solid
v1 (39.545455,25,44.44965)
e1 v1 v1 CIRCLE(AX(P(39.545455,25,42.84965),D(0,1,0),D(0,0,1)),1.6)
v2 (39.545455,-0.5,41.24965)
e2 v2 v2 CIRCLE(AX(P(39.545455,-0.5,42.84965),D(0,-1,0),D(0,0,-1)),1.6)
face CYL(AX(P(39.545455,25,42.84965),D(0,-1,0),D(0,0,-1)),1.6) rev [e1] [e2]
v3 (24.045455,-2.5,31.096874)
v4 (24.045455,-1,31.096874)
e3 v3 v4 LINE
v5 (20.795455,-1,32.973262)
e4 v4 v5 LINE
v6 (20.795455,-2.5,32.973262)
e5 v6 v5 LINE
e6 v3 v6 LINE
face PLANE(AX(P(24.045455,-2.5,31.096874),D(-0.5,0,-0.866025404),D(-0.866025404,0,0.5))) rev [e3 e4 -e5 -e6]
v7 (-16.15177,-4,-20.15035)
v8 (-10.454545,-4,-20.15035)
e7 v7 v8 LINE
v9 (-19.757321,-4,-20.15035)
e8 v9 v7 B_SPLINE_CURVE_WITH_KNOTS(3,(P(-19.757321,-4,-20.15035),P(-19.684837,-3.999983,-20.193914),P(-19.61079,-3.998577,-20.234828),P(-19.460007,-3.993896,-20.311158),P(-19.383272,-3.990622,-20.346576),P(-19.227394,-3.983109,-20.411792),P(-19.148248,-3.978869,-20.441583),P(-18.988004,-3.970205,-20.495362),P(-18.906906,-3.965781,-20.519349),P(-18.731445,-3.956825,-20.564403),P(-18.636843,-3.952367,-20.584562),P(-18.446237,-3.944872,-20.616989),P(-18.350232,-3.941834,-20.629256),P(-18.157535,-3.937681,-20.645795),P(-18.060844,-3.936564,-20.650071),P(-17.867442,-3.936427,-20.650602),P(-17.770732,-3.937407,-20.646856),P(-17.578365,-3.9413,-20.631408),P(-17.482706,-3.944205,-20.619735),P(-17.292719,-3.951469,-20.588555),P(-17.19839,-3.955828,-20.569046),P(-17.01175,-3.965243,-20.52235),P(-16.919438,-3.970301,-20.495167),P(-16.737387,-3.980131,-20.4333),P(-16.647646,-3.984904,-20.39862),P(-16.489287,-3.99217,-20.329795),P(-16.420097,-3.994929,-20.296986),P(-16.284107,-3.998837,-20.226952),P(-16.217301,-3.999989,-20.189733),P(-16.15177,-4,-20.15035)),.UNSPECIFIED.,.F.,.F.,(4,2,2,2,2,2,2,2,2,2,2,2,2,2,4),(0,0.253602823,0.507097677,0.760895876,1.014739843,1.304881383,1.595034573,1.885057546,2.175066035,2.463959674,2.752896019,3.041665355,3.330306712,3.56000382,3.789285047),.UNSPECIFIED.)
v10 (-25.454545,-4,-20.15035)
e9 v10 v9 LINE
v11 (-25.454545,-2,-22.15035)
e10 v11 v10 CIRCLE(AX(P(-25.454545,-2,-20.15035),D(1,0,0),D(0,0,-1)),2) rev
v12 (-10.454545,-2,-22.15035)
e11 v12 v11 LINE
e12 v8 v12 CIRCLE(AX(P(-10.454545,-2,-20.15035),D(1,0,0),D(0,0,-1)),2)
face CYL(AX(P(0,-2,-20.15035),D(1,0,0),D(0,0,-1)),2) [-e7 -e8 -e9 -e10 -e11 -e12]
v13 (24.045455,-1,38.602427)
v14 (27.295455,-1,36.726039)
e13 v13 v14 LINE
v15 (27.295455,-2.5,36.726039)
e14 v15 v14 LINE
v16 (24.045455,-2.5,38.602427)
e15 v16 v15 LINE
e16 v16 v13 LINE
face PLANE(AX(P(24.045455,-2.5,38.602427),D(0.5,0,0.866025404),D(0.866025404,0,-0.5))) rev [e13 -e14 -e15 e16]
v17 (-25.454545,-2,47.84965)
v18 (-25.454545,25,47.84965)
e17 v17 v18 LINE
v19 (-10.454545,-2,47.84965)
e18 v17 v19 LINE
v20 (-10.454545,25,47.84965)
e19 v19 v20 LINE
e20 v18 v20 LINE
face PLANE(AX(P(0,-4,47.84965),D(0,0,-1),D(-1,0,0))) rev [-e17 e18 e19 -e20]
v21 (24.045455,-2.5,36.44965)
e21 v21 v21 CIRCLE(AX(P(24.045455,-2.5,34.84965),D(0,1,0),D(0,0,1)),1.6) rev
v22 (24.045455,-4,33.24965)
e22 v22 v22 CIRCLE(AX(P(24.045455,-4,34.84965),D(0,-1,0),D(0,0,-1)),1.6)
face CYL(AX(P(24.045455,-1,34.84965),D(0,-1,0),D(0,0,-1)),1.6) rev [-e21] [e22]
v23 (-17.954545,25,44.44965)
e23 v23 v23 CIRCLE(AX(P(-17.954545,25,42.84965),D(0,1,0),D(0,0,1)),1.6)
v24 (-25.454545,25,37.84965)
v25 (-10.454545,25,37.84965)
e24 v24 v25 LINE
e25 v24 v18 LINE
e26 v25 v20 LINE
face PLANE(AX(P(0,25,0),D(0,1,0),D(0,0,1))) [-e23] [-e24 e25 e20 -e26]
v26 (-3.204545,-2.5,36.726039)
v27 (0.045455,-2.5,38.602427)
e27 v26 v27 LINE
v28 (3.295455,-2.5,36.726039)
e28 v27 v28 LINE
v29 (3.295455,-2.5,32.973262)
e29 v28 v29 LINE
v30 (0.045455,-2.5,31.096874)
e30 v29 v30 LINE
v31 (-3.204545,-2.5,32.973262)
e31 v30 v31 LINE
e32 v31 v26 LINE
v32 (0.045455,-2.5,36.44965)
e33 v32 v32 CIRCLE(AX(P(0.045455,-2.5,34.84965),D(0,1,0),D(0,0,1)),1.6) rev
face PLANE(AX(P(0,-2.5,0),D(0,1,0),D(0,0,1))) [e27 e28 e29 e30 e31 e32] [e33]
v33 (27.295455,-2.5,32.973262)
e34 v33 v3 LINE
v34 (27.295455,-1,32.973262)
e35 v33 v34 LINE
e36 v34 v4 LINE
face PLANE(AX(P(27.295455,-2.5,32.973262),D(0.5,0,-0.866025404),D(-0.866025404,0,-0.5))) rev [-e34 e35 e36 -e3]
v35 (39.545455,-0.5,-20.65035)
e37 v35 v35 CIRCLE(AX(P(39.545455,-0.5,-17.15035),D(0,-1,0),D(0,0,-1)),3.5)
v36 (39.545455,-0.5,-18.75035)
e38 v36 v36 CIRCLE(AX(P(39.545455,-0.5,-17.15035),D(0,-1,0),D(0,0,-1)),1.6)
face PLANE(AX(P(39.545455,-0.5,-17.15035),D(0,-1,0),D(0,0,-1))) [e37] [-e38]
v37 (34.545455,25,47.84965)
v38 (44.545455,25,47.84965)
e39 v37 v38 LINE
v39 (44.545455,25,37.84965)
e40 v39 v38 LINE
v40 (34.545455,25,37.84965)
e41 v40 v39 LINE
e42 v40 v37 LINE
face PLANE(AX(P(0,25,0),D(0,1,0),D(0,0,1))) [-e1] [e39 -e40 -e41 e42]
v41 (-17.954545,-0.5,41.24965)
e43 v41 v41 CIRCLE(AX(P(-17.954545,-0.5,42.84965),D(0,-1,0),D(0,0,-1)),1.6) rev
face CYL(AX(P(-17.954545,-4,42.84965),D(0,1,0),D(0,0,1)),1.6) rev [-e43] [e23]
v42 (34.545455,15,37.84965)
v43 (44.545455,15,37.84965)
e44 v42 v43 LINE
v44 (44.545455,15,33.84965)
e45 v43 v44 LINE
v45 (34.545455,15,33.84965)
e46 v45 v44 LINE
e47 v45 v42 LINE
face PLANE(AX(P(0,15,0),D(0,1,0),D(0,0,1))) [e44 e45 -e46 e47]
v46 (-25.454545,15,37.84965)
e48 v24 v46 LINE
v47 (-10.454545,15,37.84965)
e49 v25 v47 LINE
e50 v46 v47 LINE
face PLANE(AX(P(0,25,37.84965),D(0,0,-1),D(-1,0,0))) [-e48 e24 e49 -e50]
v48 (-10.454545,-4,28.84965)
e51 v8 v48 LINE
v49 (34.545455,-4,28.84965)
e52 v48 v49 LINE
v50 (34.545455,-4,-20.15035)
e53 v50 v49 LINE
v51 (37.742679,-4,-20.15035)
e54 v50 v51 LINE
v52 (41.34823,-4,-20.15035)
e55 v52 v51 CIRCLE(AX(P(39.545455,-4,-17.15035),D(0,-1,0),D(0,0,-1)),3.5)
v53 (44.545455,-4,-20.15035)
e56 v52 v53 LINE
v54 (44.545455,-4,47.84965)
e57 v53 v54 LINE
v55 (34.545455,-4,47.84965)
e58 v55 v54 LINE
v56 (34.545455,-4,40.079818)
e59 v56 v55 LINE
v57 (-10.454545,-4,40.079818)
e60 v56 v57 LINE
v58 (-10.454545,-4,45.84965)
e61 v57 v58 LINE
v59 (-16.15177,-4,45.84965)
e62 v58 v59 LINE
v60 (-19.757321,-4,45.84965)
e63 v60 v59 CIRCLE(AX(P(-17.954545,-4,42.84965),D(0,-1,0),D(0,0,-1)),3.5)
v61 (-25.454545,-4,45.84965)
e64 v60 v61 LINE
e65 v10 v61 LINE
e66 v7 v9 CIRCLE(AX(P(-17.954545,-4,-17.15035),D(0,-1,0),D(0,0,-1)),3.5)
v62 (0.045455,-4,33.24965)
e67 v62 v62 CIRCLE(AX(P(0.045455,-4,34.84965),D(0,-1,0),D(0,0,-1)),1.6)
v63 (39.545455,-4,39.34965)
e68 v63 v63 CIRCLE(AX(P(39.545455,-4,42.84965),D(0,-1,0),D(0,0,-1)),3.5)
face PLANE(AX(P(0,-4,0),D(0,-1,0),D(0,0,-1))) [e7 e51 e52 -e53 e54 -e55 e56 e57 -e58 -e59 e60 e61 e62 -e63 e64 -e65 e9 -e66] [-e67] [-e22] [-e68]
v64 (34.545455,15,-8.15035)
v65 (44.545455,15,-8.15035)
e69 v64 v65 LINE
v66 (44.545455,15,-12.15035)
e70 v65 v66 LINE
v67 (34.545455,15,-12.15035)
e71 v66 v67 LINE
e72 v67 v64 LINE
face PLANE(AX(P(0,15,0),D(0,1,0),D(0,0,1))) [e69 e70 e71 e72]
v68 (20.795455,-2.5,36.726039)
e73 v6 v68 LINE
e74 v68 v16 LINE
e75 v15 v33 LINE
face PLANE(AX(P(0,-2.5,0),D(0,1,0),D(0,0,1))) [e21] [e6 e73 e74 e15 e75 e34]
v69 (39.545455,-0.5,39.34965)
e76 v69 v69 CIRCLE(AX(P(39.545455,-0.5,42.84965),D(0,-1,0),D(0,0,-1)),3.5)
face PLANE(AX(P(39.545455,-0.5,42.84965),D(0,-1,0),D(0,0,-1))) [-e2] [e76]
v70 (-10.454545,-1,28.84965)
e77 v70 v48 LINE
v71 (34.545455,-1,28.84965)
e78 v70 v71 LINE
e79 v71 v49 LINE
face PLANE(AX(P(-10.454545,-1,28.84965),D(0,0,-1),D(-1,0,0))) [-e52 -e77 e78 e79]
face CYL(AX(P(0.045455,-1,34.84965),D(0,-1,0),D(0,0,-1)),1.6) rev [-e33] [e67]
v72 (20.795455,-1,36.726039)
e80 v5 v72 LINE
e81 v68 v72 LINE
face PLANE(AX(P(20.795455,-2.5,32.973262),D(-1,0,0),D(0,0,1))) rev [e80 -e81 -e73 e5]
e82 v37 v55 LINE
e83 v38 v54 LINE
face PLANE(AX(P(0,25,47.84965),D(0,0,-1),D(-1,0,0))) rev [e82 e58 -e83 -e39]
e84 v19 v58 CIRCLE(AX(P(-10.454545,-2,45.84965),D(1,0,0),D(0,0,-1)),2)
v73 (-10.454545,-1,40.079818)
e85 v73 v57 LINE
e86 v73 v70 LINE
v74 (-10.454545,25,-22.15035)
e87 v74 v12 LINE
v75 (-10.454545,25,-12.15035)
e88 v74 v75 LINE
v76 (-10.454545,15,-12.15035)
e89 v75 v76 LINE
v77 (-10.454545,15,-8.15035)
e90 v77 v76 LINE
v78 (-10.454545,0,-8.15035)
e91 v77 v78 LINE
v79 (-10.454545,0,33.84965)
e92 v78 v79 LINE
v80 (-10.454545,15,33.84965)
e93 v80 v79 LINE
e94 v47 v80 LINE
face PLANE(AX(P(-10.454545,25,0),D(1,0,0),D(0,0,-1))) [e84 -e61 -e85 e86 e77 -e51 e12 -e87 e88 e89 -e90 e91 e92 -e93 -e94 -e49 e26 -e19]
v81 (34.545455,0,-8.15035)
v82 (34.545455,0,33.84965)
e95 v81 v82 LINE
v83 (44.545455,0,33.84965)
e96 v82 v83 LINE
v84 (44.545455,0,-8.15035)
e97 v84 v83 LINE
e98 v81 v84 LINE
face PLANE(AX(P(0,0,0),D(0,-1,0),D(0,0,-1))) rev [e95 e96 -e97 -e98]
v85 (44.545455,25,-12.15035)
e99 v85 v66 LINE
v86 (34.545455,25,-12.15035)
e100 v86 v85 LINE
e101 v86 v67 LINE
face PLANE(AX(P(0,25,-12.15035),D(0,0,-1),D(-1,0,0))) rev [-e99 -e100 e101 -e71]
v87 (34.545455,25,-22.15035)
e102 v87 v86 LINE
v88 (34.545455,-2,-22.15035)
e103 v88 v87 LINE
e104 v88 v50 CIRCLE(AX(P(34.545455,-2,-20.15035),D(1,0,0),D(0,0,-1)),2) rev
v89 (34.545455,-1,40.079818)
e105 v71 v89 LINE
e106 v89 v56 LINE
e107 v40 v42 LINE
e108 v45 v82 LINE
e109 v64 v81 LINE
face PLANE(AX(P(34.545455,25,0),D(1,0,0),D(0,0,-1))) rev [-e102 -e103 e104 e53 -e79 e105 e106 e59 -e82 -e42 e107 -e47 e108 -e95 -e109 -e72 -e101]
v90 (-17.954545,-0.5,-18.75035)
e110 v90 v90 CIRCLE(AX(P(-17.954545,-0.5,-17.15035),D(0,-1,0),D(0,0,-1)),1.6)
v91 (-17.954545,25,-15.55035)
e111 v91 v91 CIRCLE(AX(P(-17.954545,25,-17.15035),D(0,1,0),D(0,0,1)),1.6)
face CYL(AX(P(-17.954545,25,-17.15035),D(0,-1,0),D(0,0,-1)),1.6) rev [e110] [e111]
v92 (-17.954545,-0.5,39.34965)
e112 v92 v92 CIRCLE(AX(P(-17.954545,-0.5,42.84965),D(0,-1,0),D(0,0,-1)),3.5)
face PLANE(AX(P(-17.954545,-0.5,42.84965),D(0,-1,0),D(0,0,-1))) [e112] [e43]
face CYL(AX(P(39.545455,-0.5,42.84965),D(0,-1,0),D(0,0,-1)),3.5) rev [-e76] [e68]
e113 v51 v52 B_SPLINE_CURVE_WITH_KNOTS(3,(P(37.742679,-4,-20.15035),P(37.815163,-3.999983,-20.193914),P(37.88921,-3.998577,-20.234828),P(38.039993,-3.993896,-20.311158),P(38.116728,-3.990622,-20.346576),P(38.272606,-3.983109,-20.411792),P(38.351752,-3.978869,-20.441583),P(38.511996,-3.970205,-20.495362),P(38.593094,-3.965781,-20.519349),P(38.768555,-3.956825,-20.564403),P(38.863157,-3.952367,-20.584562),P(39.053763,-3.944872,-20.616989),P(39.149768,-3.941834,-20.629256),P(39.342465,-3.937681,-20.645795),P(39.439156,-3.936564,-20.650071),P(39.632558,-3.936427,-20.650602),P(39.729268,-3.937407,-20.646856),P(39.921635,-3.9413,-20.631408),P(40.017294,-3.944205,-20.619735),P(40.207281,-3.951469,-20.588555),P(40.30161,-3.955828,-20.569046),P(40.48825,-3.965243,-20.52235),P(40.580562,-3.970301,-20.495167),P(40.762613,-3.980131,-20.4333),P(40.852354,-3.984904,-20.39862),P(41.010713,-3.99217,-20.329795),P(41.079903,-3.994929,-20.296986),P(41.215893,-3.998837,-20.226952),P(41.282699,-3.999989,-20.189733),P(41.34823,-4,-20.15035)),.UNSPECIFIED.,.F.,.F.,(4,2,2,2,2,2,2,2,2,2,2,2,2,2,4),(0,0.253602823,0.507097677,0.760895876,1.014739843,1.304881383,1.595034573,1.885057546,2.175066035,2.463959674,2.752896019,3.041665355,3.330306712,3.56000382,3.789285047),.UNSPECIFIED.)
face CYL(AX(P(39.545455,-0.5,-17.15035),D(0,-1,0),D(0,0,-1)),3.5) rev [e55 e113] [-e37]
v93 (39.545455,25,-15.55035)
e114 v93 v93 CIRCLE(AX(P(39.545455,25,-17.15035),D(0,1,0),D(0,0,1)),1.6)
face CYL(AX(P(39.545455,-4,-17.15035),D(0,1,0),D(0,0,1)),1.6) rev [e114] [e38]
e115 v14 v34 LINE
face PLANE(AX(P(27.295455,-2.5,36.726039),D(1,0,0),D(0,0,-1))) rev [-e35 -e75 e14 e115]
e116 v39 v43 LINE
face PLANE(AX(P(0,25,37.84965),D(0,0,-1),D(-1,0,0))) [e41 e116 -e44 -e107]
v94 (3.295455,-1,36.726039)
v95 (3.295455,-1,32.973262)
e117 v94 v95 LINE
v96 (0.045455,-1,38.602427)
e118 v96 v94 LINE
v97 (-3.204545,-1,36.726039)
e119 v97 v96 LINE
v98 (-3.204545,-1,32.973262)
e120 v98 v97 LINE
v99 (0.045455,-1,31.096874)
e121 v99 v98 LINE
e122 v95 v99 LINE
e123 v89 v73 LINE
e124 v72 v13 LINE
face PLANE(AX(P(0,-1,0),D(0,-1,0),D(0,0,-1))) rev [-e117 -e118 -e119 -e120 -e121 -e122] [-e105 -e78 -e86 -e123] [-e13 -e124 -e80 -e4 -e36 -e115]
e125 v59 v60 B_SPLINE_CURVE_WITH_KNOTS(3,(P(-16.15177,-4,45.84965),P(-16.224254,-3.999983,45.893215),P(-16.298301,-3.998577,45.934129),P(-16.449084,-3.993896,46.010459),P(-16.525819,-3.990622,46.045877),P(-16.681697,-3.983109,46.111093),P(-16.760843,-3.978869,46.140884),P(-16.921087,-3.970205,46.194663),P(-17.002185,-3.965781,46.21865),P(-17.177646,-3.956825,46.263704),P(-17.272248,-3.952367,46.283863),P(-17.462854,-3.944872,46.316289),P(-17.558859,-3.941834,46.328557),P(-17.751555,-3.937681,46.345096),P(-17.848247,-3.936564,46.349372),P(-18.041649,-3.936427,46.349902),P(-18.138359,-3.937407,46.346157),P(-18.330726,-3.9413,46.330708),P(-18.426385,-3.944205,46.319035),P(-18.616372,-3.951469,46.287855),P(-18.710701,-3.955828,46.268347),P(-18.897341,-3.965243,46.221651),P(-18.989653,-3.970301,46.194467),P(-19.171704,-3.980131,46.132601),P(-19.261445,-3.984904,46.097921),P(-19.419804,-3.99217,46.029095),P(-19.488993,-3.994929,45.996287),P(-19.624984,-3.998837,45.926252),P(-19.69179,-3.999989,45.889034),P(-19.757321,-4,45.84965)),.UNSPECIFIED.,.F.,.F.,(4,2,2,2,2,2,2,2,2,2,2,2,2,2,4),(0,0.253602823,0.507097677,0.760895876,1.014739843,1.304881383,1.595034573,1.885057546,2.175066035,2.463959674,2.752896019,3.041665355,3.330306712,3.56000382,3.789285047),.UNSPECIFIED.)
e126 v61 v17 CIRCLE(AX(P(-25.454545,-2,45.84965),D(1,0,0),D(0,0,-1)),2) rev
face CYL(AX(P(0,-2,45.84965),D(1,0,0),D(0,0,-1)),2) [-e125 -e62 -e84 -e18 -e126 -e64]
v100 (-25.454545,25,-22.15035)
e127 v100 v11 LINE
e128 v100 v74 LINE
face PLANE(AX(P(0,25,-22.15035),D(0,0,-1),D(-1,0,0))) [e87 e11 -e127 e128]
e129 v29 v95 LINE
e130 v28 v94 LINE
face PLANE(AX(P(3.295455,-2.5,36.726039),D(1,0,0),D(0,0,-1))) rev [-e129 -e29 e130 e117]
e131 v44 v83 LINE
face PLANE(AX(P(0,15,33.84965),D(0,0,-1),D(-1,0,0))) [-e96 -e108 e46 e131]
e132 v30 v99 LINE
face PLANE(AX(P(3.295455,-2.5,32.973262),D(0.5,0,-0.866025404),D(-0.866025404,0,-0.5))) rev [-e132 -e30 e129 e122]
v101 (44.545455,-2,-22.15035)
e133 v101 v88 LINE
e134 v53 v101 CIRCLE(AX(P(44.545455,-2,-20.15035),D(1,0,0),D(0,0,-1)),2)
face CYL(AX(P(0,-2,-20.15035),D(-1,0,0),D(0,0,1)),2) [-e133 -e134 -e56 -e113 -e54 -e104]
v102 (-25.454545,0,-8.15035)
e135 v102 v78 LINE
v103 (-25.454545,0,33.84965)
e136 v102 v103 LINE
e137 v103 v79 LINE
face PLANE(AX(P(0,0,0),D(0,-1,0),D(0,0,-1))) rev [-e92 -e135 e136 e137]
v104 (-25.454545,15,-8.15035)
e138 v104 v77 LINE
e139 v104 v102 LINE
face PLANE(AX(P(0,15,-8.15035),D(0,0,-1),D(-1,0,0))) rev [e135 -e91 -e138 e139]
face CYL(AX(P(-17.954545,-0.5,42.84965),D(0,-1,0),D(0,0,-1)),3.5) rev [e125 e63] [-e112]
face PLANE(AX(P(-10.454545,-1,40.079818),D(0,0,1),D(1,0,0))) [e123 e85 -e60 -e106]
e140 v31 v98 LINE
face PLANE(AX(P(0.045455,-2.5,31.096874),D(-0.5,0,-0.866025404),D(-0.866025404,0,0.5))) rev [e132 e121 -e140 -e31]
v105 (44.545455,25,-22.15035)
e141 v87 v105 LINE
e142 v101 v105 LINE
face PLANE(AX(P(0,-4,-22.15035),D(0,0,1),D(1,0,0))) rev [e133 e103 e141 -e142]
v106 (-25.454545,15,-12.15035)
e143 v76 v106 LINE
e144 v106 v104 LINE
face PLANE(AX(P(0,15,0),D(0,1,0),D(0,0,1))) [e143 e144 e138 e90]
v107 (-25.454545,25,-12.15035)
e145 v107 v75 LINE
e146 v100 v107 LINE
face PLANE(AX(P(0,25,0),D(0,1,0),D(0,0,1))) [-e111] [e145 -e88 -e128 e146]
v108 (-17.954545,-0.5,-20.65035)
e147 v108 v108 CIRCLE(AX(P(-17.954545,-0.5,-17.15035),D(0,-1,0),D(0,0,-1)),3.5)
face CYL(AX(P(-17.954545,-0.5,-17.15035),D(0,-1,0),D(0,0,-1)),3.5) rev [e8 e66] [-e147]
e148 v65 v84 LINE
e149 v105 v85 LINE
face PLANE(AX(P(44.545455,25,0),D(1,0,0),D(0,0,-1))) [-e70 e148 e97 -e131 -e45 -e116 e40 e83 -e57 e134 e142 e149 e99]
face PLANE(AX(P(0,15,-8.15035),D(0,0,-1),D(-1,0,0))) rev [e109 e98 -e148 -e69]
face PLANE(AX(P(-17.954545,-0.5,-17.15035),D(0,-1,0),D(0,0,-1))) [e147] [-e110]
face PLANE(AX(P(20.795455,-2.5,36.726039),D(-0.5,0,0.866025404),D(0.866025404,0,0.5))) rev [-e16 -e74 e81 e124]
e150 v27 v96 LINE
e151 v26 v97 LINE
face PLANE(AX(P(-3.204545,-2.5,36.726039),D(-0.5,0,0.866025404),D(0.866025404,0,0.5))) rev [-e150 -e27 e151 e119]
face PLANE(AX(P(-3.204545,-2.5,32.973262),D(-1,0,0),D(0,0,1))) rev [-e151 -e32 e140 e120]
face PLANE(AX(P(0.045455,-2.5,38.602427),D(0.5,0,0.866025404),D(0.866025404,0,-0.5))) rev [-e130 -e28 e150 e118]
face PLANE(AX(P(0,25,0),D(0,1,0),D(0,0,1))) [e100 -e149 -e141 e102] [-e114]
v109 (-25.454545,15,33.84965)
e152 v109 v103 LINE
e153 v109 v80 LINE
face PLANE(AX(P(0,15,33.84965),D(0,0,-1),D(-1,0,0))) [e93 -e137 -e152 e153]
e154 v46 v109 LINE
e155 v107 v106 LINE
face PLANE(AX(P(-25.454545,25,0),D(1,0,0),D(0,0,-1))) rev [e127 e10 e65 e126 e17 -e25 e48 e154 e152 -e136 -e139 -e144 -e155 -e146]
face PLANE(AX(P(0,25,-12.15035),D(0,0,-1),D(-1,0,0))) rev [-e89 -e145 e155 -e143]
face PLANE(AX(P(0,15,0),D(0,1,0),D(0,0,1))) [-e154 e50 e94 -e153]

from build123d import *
from build123d.topology import SkipClean

# Parameters (mm, degrees)
CROQUIS1_W                = 15
CROQUIS1_H                = 10
CROQUIS1_R                = 1.6
SALIENTE_EXTRUIR2_DEPTH   = 25
SALIENTE_EXTRUIR2_2_DEPTH = 25
CROQUIS1_W_2              = 10
SALIENTE_EXTRUIR2_3_DEPTH = 25
SALIENTE_EXTRUIR2_4_DEPTH = 25
SALIENTE_EXTRUIR3_START   = 4
CROQUIS2_R                = 1.6
CROQUIS2_W                = 15
CROQUIS2_H                = 10
SALIENTE_EXTRUIR3_DEPTH   = 4
CROQUIS3_W                = 15
CROQUIS3_H                = 4
CROQUIS3_W_2              = 10
SALIENTE_EXTRUIR4_DEPTH   = 15
CROQUIS4_R                = 3.5
CORTAR_EXTRUIR1_DEPTH     = 3.5
SALIENTE_EXTRUIR5_DEPTH   = 3
CROQUIS6_R                = 1.6
CORTAR_EXTRUIR2_DEPTH     = 3
CORTAR_EXTRUIR3_DEPTH     = 1.5
REDONDEO1_R               = 2


with BuildPart() as part:
    # Croquis1 → Saliente-Extruir2 (new body)
    with BuildSketch(Plane(origin=(0, 0, 0), x_dir=(1, 0, 0), z_dir=(0, 1, 0))):
        with Locations((-17.954545455, 17.15034965)):
            Rectangle(CROQUIS1_W, CROQUIS1_H)
        with Locations(Location((-17.954545455, 17.15034965, 0), (0, 0, 270))):
            Circle(CROQUIS1_R, mode=Mode.SUBTRACT)
    extrude(amount=SALIENTE_EXTRUIR2_DEPTH)



with BuildPart() as body_2:
    # Croquis1 → Saliente-Extruir2 2 (new body)
    with BuildSketch(Plane(origin=(0, 0, 0), x_dir=(1, 0, 0), z_dir=(0, 1, 0))):
        with Locations((-17.954545455, -42.84965035)):
            Rectangle(CROQUIS1_W, CROQUIS1_H)
        with Locations(Location((-17.954545455, -42.84965035, 0), (0, 0, 270))):
            Circle(CROQUIS1_R, mode=Mode.SUBTRACT)
    extrude(amount=SALIENTE_EXTRUIR2_2_DEPTH)


with BuildPart() as body_3:
    # Croquis1 → Saliente-Extruir2 3 (new body)
    with BuildSketch(Plane(origin=(0, 0, 0), x_dir=(1, 0, 0), z_dir=(0, 1, 0))):
        with Locations((39.545454545, -42.84965035)):
            Rectangle(CROQUIS1_W_2, CROQUIS1_H)
        with Locations(Location((39.545454545, -42.84965035, 0), (0, 0, 270))):
            Circle(CROQUIS1_R, mode=Mode.SUBTRACT)
    extrude(amount=SALIENTE_EXTRUIR2_3_DEPTH)


with BuildPart() as body_4:
    # Croquis1 → Saliente-Extruir2 4 (new body)
    with BuildSketch(Plane(origin=(0, 0, 0), x_dir=(1, 0, 0), z_dir=(0, 1, 0))):
        with Locations((39.545454545, 17.15034965)):
            Rectangle(CROQUIS1_W_2, CROQUIS1_H)
        with Locations(Location((39.545454545, 17.15034965, 0), (0, 0, 270))):
            Circle(CROQUIS1_R, mode=Mode.SUBTRACT)
    extrude(amount=SALIENTE_EXTRUIR2_4_DEPTH)


with BuildPart() as part_1:
    with SkipClean():  # the faces are left unmerged after this step: merging them gives an invalid solid
        add(part.part)

        add(body_2.part)  # Saliente-Extruir3 merges body 2

        add(body_3.part)  # Saliente-Extruir3 merges body 3

        add(body_4.part)  # Saliente-Extruir3 merges body 4
        # Croquis2 → Saliente-Extruir3 (add)
        # profile 1 of 3: a face of its own
        with BuildSketch(Plane.XZ.offset(SALIENTE_EXTRUIR3_START)):
            Polygon((-25.454545455, -22.15034965), (-10.454545455, -22.15034965), (-10.454545455, -12.15034965), (-10.454545455, 37.84965035), (-25.454545455, 37.84965035), (-25.454545455, -12.15034965), align=None)
            with Locations(Location((-17.954545455, -17.15034965, 0), (0, 0, 270))):
                Circle(CROQUIS2_R, mode=Mode.SUBTRACT)
        # profile 2 of 3: a face of its own
        with BuildSketch(Plane.XZ.offset(SALIENTE_EXTRUIR3_START)):
            with Locations((-17.954545455, 42.84965035)):
                Rectangle(CROQUIS2_W, CROQUIS2_H)
            with Locations(Location((-17.954545455, 42.84965035, 0), (0, 0, 90))):
                Circle(CROQUIS2_R, mode=Mode.SUBTRACT)
        # profile 3 of 3: a face of its own
        with BuildSketch(Plane.XZ.offset(SALIENTE_EXTRUIR3_START)):
            Polygon((34.545454545, -12.15034965), (34.545454545, -22.15034965), (44.545454545, -22.15034965), (44.545454545, -12.15034965), (44.545454545, 37.84965035), (44.545454545, 47.84965035), (34.545454545, 47.84965035), (34.545454545, 37.84965035), align=None)
            with Locations(Location((39.545454545, -17.15034965, 0), (0, 0, 90))):
                Circle(CROQUIS2_R, mode=Mode.SUBTRACT)
            with Locations(Location((39.545454545, 42.84965035, 0), (0, 0, 270))):
                Circle(CROQUIS2_R, mode=Mode.SUBTRACT)
        extrude(amount=-SALIENTE_EXTRUIR3_DEPTH)

    # Croquis3 → Saliente-Extruir4 (add)
    with BuildSketch(Plane(origin=(0, 0, 0), x_dir=(1, 0, 0), z_dir=(0, 1, 0))):
        with Locations((-17.954545455, -35.84965035)):
            Rectangle(CROQUIS3_W, CROQUIS3_H)
        with Locations((-17.954545455, 10.15034965)):
            Rectangle(CROQUIS3_W, CROQUIS3_H)
        with Locations((39.545454545, 10.15034965)):
            Rectangle(CROQUIS3_W_2, CROQUIS3_H)
        with Locations((39.545454545, -35.84965035)):
            Rectangle(CROQUIS3_W_2, CROQUIS3_H)
    extrude(amount=SALIENTE_EXTRUIR4_DEPTH)

    # Croquis4 → Cortar-Extruir1 (cut)
    with SkipClean():  # the faces are left unmerged after this step: merging them gives an invalid solid
        with BuildSketch(Plane.XZ.offset(4)):
            with Locations(Location((39.545454545, 42.84965035, 0), (0, 0, 270))):
                Circle(CROQUIS4_R)
            with Locations(Location((39.545454545, -17.15034965, 0), (0, 0, 270))):
                Circle(CROQUIS4_R)
            with Locations(Location((-17.954545455, -17.15034965, 0), (0, 0, 270))):
                Circle(CROQUIS4_R)
            with Locations(Location((-17.954545455, 42.84965035, 0), (0, 0, 270))):
                Circle(CROQUIS4_R)
        extrude(amount=-CORTAR_EXTRUIR1_DEPTH, mode=Mode.SUBTRACT)

    # Croquis5 → Saliente-Extruir5 (add)
    with SkipClean():  # the faces are left unmerged after this step: merging them gives an invalid solid
        with BuildSketch(Plane.XZ.offset(4)):
            Polygon((-10.454545455, 40.07981816), (34.545454545, 40.07981816), (34.545454545, 35.84965035), (34.545454545, 28.84965035), (-10.454545455, 28.84965035), (-10.454545455, 35.84965035), align=None)
        extrude(amount=-SALIENTE_EXTRUIR5_DEPTH)

    # Croquis6 → Cortar-Extruir2 (cut)
    with SkipClean():  # the faces are left unmerged after this step: merging them gives an invalid solid
        with BuildSketch(Plane.XZ.offset(4)):
            with Locations(Location((24.045454545, 34.84965035, 0), (0, 0, 270))):
                Circle(CROQUIS6_R)
            with Locations(Location((0.045454545, 34.84965035, 0), (0, 0, 270))):
                Circle(CROQUIS6_R)
        extrude(amount=-CORTAR_EXTRUIR2_DEPTH, mode=Mode.SUBTRACT)

    # Croquis7 → Cortar-Extruir3 (cut)
    with SkipClean():  # the faces are left unmerged after this step: merging them gives an invalid solid
        with BuildSketch(Plane(origin=(0, -1, 0), x_dir=(1, 0, 0), z_dir=(0, 1, 0))):
            Polygon((0.045454545, -31.0968736), (-3.204545455, -32.973261975), (-3.204545455, -36.726038725), (0.045454545, -38.602427099), (3.295454545, -36.726038725), (3.295454545, -32.973261975), align=None)
            Polygon((24.045454545, -31.0968736), (20.795454545, -32.973261975), (20.795454545, -36.726038725), (24.045454545, -38.602427099), (27.295454545, -36.726038725), (27.295454545, -32.973261975), align=None)
        extrude(amount=-CORTAR_EXTRUIR3_DEPTH, mode=Mode.SUBTRACT)

    # Redondeo1
    # the kernel refuses this fillet: 2 mm, written as the material it takes off along each edge
    with BuildSketch(Plane(origin=(-5.454545455, -4, 47.84965035), x_dir=(0, 0, -1), z_dir=(-1, 0, 0)), Plane(origin=(-30.454545455, -4, -22.15034965), x_dir=(0, 0, 1), z_dir=(1, 0, 0))) as redondeo1_piece_1:
        with BuildLine():
            CenterArc((REDONDEO1_R, -REDONDEO1_R), REDONDEO1_R, 90, 90)
            Line((0, -REDONDEO1_R), (0, 0))
            Line((0, 0), (REDONDEO1_R, 0))
        make_face()
    extrude(amount=25, mode=Mode.SUBTRACT)
    with BuildSketch(Plane(origin=(29.545454545, -4, -22.15034965), x_dir=(0, 1, 0), z_dir=(1, 0, 0))) as redondeo1_piece_2:
        with BuildLine():
            CenterArc((REDONDEO1_R, REDONDEO1_R), REDONDEO1_R, 180, 90)
            Line((0, REDONDEO1_R), (0, 0))
            Line((0, 0), (REDONDEO1_R, 0))
        make_face()
    extrude(amount=20, mode=Mode.SUBTRACT)


solid = part_1.part
